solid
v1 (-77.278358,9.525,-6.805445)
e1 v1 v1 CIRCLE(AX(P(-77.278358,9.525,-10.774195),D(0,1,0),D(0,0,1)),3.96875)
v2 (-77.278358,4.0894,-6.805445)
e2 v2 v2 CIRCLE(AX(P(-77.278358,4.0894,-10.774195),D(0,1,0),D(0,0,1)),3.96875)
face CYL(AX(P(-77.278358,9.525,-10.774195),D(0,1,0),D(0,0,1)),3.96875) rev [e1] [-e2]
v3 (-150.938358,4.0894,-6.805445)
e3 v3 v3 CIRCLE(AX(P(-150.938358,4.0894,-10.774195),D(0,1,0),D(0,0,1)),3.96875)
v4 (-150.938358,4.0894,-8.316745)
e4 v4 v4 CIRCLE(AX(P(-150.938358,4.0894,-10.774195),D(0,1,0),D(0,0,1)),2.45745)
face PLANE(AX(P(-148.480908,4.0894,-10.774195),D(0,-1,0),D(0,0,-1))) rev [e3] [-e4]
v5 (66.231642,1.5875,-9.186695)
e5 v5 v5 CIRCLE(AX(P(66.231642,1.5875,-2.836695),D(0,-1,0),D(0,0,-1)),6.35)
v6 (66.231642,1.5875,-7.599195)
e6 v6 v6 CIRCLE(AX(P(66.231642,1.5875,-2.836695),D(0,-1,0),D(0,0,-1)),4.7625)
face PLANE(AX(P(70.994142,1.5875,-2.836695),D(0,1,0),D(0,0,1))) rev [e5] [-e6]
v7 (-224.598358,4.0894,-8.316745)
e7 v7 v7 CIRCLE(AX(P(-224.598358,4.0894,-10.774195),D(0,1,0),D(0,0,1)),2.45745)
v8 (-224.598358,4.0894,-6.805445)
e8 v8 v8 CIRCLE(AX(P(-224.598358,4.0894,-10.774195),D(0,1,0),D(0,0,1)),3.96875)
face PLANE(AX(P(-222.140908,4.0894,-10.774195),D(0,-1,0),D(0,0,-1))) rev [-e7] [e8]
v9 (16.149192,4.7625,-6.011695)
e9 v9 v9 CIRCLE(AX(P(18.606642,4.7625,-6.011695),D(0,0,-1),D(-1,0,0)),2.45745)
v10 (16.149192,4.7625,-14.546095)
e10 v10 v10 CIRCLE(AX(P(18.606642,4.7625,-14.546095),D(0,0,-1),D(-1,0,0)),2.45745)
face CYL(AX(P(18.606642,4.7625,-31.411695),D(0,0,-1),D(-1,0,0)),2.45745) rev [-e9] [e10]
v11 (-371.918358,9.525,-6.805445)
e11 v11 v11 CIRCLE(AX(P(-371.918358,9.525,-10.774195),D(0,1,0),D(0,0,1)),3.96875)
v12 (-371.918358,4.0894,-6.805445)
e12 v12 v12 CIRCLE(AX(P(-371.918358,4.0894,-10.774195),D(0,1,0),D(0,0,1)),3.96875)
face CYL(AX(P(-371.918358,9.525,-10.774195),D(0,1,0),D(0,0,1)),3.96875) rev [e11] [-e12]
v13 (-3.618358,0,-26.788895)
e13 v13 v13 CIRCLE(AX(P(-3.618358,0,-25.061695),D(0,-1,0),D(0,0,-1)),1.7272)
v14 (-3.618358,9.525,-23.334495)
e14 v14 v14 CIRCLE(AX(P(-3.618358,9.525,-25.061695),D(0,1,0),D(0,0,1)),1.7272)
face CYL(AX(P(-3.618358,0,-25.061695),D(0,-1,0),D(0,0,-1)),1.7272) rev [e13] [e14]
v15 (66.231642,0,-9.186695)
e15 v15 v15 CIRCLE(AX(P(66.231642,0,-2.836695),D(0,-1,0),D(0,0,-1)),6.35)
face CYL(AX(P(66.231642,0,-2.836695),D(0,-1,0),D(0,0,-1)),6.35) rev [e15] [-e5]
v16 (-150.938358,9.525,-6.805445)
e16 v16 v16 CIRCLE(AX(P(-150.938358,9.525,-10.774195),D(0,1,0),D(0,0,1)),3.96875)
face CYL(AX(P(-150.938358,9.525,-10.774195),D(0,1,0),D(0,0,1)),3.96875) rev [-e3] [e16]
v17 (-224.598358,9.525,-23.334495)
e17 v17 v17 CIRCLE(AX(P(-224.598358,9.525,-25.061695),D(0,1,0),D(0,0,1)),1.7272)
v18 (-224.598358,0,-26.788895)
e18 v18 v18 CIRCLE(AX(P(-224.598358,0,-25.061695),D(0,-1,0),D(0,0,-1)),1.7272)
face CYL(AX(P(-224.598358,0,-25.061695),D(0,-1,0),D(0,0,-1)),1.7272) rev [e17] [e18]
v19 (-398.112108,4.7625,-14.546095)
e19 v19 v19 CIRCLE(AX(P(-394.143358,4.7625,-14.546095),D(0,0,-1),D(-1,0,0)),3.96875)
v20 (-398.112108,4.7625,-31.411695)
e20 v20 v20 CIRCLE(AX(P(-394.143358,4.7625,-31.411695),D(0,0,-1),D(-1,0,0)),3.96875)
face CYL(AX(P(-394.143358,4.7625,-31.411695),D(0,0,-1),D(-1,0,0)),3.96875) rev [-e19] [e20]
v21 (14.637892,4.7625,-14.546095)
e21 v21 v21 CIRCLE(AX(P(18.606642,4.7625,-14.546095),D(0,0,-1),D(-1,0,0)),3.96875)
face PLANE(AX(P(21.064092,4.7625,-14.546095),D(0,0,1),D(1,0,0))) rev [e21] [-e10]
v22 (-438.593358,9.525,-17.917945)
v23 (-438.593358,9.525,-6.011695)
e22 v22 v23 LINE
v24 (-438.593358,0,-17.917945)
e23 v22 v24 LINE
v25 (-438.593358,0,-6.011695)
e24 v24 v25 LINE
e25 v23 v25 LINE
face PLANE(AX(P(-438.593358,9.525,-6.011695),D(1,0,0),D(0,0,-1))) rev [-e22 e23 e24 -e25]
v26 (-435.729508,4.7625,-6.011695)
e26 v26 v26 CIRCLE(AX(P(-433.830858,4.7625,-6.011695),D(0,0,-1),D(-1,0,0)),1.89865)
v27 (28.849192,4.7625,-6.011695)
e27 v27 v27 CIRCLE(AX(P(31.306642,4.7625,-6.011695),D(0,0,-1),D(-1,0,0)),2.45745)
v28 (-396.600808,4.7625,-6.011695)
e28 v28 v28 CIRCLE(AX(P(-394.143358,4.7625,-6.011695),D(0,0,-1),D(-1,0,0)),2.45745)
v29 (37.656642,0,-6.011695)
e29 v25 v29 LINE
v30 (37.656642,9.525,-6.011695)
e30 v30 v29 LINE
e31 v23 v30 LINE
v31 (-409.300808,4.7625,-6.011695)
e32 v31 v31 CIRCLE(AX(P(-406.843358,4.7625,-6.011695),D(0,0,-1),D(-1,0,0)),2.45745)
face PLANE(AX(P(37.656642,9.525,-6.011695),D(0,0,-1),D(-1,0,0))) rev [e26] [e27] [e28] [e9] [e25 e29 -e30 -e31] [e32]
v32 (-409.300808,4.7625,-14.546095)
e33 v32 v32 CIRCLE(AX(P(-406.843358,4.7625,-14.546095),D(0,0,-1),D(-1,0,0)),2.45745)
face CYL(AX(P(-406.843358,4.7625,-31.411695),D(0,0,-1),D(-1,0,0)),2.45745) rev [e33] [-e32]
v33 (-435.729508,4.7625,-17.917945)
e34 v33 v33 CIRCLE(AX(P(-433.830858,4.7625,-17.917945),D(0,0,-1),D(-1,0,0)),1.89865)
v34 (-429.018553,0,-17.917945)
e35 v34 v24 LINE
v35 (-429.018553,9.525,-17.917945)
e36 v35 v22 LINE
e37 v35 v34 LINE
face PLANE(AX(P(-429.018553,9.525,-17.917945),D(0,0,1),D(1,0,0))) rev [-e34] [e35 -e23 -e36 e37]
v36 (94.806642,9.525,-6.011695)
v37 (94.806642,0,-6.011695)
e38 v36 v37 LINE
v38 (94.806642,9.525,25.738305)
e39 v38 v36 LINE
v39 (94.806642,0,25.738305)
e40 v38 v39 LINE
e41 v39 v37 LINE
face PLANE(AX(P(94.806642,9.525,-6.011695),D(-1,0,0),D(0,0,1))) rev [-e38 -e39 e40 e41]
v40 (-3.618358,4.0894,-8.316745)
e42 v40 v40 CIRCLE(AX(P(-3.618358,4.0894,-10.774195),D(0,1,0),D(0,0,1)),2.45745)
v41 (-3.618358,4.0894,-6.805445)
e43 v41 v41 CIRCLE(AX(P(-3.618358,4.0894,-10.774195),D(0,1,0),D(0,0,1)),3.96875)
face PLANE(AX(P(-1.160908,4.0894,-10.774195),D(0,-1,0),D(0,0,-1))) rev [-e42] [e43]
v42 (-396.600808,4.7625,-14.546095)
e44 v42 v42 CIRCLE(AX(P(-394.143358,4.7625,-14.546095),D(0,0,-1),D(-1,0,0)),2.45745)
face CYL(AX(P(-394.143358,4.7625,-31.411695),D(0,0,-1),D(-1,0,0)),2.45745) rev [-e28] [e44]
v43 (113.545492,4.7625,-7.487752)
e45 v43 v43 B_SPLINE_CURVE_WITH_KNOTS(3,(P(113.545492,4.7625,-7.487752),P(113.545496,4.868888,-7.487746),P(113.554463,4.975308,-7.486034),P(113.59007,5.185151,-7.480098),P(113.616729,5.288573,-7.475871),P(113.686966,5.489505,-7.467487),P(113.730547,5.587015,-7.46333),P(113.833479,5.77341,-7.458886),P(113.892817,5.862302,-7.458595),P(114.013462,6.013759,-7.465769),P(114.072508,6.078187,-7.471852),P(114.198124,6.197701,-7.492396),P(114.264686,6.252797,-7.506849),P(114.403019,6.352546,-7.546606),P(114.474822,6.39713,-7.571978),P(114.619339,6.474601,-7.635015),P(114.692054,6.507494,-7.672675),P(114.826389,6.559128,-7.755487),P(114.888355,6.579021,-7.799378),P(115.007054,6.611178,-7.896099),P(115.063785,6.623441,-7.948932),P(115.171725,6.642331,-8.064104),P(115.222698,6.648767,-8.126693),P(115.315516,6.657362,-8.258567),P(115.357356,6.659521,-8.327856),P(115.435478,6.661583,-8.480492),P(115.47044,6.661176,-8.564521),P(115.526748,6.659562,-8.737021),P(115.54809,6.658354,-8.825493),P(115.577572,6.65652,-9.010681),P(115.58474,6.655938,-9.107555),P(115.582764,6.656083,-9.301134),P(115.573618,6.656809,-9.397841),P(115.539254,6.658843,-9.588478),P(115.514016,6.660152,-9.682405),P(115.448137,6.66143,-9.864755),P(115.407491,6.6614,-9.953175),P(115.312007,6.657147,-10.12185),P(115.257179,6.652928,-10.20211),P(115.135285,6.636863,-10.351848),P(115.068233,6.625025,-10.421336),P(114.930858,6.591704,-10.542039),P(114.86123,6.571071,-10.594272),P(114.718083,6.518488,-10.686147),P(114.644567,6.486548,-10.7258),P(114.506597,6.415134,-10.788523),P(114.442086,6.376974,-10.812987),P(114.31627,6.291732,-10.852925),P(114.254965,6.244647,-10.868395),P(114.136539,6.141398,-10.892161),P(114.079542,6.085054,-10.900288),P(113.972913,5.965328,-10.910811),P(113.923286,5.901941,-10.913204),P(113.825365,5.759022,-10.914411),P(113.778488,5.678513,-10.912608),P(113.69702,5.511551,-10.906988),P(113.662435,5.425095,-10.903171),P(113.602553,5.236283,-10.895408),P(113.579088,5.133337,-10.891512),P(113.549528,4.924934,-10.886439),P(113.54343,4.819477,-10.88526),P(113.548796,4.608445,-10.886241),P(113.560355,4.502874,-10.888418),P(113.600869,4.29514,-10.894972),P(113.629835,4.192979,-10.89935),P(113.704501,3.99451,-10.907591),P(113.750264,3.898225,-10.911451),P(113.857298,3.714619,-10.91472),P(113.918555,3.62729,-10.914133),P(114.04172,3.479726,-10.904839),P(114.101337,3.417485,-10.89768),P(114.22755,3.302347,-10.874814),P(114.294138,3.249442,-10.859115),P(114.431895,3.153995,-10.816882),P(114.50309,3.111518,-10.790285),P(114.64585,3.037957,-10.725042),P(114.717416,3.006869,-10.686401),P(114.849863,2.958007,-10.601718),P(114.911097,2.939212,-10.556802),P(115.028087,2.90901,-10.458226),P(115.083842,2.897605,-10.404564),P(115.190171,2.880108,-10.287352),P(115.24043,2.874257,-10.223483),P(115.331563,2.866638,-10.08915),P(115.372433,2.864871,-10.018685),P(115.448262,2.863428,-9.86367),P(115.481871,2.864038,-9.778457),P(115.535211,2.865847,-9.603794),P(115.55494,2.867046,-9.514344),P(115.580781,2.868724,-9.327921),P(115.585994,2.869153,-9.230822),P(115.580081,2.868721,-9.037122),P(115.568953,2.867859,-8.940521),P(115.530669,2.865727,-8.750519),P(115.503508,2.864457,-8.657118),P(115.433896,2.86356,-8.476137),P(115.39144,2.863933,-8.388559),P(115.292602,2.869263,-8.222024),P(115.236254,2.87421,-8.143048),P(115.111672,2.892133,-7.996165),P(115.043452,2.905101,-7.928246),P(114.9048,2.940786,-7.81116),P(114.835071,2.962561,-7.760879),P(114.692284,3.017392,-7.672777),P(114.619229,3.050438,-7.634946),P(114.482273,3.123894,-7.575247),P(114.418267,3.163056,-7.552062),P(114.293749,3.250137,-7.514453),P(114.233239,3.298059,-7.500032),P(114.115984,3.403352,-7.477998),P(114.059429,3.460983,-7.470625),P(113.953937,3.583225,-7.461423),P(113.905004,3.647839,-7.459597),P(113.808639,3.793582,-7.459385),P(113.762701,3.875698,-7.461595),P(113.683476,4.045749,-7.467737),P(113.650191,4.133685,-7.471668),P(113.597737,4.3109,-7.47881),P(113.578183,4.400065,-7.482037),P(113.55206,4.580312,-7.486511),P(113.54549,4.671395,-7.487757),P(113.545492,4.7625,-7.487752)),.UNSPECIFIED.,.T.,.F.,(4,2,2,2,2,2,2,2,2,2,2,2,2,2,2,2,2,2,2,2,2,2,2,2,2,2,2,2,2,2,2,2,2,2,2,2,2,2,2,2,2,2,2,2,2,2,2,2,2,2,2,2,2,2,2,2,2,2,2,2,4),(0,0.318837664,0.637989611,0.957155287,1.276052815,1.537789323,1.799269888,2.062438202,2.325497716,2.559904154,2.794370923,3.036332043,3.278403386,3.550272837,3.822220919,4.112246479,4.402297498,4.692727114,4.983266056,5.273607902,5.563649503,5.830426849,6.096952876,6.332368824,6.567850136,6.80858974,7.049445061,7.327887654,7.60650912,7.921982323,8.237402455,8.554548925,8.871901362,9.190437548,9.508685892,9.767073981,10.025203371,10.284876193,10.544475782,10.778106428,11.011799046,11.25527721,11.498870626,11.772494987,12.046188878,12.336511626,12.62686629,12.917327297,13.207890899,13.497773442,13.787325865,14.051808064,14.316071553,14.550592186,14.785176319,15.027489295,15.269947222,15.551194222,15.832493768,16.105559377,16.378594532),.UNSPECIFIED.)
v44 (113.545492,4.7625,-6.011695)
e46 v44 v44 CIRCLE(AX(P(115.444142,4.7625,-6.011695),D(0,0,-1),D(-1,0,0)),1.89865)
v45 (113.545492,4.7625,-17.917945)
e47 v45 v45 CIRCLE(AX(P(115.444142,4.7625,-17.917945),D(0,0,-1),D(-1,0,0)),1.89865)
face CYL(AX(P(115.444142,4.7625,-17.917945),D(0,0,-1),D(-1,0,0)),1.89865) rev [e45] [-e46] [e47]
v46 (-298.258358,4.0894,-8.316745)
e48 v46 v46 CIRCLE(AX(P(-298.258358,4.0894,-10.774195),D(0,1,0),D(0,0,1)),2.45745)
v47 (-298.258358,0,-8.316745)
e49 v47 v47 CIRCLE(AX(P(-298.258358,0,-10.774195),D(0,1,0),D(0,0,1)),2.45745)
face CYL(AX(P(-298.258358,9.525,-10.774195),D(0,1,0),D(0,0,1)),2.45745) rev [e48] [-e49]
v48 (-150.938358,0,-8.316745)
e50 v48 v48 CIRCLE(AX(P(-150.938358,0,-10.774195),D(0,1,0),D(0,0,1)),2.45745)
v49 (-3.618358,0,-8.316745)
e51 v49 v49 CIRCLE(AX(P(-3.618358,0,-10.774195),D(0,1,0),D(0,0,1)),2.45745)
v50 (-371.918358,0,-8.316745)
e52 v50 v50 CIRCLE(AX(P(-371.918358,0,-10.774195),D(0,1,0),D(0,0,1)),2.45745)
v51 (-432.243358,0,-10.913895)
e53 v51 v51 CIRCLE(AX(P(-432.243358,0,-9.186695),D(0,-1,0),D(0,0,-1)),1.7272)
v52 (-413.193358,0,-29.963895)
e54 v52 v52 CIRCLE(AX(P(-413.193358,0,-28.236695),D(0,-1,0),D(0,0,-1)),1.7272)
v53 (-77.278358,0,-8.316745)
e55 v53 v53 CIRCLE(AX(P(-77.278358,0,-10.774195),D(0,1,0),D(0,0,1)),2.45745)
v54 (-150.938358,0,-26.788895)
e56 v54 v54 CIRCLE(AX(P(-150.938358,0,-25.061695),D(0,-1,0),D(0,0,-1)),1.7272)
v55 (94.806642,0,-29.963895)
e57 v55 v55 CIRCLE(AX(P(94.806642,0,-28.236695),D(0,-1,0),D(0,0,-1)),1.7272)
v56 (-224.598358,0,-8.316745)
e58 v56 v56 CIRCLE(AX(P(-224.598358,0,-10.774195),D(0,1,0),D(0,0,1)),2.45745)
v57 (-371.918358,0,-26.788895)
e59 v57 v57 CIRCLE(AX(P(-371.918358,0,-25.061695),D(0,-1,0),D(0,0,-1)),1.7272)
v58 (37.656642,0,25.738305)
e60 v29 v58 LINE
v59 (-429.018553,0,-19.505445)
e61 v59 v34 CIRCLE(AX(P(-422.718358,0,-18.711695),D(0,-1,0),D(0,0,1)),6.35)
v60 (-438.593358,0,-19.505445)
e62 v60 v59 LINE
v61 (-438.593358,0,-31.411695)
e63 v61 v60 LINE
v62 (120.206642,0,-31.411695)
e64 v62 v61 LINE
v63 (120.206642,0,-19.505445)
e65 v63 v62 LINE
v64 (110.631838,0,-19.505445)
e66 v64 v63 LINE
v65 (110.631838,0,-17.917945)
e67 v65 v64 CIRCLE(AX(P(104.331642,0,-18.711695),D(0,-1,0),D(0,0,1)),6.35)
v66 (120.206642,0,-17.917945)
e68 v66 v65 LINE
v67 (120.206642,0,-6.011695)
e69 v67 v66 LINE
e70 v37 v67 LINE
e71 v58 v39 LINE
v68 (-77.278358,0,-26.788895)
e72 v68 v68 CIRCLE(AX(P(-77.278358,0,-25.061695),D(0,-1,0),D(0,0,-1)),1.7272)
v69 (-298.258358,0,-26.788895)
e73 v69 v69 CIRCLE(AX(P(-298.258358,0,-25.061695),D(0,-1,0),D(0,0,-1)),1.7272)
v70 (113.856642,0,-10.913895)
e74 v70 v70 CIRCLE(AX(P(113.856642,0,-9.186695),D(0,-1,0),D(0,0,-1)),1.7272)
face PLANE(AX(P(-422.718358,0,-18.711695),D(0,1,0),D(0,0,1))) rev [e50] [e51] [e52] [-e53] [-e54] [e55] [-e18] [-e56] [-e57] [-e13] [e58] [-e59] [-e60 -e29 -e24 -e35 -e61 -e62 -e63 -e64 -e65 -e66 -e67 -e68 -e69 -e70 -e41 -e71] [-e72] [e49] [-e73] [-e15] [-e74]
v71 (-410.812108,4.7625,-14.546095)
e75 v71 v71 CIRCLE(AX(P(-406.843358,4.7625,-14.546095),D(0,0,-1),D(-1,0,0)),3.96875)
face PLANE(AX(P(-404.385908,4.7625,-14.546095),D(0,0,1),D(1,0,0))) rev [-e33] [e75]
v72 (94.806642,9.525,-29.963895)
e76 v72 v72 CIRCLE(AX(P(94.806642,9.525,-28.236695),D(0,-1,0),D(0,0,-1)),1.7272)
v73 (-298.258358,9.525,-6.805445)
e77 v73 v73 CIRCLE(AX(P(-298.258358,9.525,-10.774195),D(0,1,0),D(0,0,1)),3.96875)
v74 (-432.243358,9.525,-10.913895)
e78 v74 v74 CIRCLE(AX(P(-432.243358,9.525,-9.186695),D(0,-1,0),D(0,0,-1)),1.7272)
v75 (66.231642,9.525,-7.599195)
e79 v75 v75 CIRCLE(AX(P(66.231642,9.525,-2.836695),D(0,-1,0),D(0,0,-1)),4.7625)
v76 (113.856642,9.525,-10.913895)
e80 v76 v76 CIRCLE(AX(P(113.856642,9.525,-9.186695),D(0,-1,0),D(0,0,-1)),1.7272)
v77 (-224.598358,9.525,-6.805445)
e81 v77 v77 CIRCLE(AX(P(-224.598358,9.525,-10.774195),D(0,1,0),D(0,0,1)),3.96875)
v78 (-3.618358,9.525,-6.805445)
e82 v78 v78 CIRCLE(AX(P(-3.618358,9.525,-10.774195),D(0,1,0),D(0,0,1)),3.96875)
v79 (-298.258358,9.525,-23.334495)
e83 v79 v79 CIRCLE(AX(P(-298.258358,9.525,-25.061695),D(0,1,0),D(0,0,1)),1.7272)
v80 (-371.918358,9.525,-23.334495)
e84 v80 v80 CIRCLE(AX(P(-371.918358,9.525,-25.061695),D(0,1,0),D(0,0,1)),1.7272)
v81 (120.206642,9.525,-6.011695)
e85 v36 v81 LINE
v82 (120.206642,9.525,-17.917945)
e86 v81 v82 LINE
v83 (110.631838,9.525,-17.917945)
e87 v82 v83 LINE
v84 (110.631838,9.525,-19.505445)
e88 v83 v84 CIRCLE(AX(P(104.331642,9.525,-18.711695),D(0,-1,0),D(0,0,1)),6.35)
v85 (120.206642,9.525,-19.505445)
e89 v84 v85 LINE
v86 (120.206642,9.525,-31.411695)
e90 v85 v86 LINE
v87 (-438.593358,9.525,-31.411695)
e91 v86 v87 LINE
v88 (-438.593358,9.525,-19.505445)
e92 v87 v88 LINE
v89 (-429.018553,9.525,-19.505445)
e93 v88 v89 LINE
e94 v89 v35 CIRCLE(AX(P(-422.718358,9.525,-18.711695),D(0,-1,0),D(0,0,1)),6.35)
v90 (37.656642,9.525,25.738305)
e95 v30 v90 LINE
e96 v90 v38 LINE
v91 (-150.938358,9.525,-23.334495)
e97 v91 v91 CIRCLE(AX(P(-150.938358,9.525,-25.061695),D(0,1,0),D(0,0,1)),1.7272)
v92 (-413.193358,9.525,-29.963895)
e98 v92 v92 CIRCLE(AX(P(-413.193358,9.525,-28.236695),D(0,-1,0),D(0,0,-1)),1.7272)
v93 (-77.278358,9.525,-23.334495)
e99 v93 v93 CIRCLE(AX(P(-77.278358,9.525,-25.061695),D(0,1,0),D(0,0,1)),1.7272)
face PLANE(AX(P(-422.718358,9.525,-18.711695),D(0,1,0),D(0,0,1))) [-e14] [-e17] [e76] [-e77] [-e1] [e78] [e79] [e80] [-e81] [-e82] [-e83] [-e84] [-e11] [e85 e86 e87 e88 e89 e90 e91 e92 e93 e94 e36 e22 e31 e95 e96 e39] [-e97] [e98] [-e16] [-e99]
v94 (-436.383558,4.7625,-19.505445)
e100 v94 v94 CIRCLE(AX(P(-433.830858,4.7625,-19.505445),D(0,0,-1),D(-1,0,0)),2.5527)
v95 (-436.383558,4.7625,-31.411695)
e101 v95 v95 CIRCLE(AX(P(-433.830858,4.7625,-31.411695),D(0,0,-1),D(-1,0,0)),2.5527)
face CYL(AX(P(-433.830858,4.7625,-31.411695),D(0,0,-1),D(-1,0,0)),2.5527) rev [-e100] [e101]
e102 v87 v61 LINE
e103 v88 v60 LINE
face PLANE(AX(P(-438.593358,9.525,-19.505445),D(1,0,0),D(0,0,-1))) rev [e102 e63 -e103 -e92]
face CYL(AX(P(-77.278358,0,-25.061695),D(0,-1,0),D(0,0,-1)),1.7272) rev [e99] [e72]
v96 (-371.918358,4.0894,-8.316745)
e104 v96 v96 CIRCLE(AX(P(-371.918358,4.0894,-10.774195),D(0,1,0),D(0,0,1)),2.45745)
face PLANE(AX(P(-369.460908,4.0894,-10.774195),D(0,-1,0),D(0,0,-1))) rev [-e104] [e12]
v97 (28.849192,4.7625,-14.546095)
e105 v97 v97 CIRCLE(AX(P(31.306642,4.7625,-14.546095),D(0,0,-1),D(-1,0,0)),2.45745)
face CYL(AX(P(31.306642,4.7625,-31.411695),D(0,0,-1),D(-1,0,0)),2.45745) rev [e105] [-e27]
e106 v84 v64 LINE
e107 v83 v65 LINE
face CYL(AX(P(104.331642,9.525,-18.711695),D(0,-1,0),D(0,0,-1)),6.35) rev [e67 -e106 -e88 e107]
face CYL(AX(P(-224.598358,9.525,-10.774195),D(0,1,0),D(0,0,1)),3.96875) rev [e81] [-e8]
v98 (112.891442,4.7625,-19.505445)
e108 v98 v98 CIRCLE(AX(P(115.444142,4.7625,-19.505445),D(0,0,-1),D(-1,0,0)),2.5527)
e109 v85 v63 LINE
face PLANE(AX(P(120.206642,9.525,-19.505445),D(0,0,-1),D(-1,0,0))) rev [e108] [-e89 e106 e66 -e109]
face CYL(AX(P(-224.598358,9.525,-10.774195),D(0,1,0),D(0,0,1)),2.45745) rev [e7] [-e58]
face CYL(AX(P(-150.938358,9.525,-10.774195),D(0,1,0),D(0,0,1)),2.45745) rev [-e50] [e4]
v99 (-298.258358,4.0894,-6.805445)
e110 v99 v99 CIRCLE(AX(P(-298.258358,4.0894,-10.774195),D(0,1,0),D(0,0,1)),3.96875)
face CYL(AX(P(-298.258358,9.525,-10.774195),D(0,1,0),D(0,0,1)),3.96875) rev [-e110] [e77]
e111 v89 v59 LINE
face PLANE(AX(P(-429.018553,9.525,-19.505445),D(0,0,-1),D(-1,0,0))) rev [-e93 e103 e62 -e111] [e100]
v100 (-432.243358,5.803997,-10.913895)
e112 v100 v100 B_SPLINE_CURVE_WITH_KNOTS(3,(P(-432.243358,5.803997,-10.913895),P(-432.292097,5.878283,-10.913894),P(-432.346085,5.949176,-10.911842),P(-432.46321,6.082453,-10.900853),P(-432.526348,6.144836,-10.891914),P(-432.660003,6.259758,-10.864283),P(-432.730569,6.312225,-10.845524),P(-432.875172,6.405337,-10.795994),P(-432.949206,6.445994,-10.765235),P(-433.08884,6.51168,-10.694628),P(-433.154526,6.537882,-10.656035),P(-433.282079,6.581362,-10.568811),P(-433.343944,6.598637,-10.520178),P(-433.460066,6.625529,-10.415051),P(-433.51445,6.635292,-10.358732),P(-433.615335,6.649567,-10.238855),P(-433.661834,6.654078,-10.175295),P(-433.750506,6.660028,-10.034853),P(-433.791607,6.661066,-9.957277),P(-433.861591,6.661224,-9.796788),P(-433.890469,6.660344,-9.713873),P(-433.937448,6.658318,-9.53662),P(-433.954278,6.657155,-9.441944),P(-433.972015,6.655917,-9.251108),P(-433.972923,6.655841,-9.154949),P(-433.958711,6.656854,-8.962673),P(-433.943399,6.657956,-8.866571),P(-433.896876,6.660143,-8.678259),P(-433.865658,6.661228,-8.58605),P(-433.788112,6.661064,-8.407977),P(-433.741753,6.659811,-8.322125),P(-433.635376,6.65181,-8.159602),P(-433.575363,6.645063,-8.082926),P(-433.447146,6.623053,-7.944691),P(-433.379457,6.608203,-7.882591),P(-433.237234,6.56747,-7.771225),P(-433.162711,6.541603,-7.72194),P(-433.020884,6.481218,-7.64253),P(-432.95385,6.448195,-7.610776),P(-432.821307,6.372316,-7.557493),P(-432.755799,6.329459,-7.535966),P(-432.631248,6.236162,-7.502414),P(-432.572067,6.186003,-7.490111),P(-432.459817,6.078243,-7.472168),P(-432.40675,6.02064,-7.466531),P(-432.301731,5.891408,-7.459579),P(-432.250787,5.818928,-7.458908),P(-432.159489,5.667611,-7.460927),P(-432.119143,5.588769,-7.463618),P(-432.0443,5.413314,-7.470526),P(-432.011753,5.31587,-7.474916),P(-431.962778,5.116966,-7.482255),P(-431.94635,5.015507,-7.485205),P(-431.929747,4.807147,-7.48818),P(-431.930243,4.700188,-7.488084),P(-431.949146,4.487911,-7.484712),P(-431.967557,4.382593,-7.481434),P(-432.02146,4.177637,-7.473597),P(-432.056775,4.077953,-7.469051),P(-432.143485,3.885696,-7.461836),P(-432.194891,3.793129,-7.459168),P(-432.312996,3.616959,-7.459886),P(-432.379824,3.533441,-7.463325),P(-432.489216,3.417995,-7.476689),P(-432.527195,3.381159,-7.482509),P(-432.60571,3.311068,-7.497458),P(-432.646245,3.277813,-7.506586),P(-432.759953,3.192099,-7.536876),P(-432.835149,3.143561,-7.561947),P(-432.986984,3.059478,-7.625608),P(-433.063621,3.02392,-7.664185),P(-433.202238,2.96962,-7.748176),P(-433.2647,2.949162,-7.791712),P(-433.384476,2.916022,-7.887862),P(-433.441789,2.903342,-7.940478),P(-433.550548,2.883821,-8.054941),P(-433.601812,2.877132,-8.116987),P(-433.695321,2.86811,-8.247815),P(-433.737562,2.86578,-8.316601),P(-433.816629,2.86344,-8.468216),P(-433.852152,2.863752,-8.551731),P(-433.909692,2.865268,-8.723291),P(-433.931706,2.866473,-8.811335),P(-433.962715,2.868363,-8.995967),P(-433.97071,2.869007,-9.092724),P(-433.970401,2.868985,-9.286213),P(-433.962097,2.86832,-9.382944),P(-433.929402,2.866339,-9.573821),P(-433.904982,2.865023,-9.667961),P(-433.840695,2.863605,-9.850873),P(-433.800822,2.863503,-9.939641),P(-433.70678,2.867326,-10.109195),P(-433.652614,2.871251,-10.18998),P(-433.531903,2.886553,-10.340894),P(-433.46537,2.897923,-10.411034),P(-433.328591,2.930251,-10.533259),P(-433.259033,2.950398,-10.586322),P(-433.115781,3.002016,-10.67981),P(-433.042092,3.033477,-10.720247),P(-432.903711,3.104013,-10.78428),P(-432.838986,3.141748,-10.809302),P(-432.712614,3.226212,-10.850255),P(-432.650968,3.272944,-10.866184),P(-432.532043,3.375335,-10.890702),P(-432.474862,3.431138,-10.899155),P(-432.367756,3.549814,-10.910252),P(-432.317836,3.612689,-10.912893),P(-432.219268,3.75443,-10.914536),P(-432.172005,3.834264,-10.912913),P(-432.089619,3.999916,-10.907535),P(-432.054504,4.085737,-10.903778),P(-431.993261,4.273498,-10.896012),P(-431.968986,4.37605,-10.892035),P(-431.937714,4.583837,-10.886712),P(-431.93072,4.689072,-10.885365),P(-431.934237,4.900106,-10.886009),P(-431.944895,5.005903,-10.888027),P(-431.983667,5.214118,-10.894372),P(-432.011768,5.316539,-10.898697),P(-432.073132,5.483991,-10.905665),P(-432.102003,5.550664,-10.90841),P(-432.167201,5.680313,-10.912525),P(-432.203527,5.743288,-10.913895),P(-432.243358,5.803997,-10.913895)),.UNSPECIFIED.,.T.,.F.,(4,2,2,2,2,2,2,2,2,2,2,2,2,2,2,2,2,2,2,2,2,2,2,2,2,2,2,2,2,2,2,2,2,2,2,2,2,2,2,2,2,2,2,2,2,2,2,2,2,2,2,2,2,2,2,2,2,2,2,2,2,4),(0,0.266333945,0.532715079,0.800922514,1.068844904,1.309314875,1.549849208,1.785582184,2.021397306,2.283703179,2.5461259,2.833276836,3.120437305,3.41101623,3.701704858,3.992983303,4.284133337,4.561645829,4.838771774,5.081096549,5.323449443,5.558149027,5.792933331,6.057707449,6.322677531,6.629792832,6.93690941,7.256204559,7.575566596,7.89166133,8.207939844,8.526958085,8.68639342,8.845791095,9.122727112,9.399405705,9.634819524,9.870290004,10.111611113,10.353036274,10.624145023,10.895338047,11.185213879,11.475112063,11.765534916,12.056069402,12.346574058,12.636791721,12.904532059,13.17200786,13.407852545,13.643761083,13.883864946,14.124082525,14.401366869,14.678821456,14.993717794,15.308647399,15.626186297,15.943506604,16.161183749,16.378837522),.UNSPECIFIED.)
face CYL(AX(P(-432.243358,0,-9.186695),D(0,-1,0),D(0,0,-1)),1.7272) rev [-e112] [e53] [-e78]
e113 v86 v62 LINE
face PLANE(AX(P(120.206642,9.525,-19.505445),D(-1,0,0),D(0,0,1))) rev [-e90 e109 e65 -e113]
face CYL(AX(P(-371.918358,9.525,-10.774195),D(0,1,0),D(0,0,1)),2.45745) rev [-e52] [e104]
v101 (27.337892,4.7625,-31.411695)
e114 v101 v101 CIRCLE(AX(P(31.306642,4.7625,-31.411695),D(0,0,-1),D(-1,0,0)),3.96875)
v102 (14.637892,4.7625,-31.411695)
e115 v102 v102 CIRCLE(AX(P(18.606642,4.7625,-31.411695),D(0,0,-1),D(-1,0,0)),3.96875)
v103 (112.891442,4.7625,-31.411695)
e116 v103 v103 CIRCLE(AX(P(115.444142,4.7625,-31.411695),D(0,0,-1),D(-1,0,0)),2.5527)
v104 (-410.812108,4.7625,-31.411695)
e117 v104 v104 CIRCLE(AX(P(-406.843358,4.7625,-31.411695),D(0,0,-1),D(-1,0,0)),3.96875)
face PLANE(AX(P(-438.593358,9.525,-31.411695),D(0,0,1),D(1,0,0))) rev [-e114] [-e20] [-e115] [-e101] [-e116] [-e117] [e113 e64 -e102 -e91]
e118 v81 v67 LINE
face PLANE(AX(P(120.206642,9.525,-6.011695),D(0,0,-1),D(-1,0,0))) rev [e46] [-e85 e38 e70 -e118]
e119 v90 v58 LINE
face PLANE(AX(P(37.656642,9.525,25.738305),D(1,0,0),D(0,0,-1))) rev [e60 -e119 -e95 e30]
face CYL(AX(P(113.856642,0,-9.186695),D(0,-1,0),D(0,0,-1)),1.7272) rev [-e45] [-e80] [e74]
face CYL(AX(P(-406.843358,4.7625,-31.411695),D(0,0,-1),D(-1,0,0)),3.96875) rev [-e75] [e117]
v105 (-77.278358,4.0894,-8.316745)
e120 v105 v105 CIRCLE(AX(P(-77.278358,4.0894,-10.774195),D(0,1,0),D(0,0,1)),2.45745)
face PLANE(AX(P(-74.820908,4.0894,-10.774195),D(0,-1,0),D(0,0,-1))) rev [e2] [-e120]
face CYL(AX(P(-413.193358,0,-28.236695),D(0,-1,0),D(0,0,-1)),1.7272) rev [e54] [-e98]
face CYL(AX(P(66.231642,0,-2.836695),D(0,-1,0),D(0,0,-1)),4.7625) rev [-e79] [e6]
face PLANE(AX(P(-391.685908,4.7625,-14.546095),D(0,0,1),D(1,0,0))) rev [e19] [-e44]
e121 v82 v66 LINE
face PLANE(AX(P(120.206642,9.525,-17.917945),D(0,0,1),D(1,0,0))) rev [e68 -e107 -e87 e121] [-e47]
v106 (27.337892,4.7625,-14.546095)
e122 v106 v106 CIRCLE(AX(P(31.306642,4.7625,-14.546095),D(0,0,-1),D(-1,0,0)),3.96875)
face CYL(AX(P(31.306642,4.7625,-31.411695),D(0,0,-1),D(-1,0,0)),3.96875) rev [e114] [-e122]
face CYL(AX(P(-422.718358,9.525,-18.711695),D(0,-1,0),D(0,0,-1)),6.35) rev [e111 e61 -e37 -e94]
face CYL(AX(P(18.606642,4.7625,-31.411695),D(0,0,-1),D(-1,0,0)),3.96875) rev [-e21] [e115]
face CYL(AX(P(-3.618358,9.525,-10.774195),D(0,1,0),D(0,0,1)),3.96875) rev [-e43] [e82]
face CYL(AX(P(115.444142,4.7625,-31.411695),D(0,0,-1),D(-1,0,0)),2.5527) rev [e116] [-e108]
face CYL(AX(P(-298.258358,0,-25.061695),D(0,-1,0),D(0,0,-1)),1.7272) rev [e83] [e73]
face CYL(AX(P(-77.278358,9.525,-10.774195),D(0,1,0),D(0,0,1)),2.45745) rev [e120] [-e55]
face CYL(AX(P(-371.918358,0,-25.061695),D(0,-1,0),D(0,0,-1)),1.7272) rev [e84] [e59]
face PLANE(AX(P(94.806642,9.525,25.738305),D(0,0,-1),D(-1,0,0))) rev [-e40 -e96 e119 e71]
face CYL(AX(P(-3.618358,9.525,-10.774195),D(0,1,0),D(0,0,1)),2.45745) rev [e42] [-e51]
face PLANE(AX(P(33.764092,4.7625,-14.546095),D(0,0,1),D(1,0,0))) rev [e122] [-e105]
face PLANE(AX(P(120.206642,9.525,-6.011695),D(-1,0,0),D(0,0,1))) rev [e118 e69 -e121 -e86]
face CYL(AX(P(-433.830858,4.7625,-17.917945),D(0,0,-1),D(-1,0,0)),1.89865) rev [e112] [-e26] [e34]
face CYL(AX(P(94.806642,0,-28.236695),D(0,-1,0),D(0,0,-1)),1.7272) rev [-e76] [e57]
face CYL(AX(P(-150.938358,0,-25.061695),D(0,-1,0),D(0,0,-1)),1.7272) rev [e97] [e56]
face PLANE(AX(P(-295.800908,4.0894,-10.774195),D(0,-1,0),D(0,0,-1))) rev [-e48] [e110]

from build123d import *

# Parameters (mm, degrees)
BOSS_EXTRUDE1_DEPTH                            = 9.525
SKETCH2_W                                      = 1.89865
SKETCH2_H                                      = 43.65625
F_10_CLEARANCE_HOLE1_D                         = 5.1054
F_10_CLEARANCE_HOLE1_DEPTH                     = 11.90625
F_10_CLEARANCE_HOLE2_D                         = 5.1054
F_10_CLEARANCE_HOLE2_DEPTH                     = 11.90625
F_10_24_TAPPED_HOLE2_D                         = 3.7973
CBORE_FOR_8_SOCKET_HEAD_CAP_SCREW1_D           = 4.9149
CBORE_FOR_8_SOCKET_HEAD_CAP_SCREW1_CBORE_D     = 7.9375
CBORE_FOR_8_SOCKET_HEAD_CAP_SCREW1_CBORE_DEPTH = 16.8656
HOLE1_START                                    = 4.0894
HOLE1_OUTLINE_R                                = 1.7272
HOLE1_OUTLINE_R_2                              = 3.96875
HOLE1_OUTLINE_R_3                              = 4.7625
HOLE1_DEPTH                                    = 5.4356
HOLE1_2_OUTLINE_R                              = 1.7272
HOLE1_2_OUTLINE_R_2                            = 2.45745
HOLE1_2_OUTLINE_R_3                            = 4.7625
HOLE1_2_DEPTH                                  = 4.0894
HOLE1_3_OUTLINE_R                              = 6.35
HOLE1_3_OUTLINE_R_2                            = 4.7625
HOLE1_3_DEPTH                                  = 1.5875
F_8_32_TAPPED_HOLE2_D                          = 3.4544


# Read off the part's stored shape, not the designer's step: Hole1
with BuildPart() as part:
    # Sketch1 → Boss-Extrude1 (new body)
    with BuildSketch(Plane(origin=(0, 0, 0), x_dir=(1, 0, 0), z_dir=(0, 1, 0))):
        with BuildLine():
            Line((120.206642486, 6.011694636), (120.206642486, 17.917944636))
            Line((120.206642486, 17.917944636), (110.631837795, 17.917944636))
            ThreePointArc((110.631837795, 17.917944636), (97.981642486, 18.711694636), (110.631837795, 19.505444636))
            Line((110.631837795, 19.505444636), (120.206642486, 19.505444636))
            Line((120.206642486, 19.505444636), (120.206642486, 31.411694636))
            Line((120.206642486, 31.411694636), (-438.593357514, 31.411694636))
            Line((-438.593357514, 31.411694636), (-438.593357514, 19.505444636))
            Line((-438.593357514, 19.505444636), (-429.018552824, 19.505444636))
            ThreePointArc((-429.018552824, 19.505444636), (-416.368357514, 18.711694636), (-429.018552824, 17.917944636))
            Line((-429.018552824, 17.917944636), (-438.593357514, 17.917944636))
            Line((-438.593357514, 17.917944636), (-438.593357514, 6.011694636))
            Line((-438.593357514, 6.011694636), (37.656642486, 6.011694636))
            Line((37.656642486, 6.011694636), (37.656642486, -25.738305364))
            Line((37.656642486, -25.738305364), (94.806642486, -25.738305364))
            Line((94.806642486, -25.738305364), (94.806642486, 6.011694636))
            Line((94.806642486, 6.011694636), (120.206642486, 6.011694636))
        make_face()
    extrude(amount=BOSS_EXTRUDE1_DEPTH)

    # Sketch2 → #10-24 Tapped Hole1 (revolve, cut)
    with BuildSketch(Plane(origin=(115.444142486, 4.7625, -17.917944636), x_dir=(0, 1, 0), z_dir=(1, 0, 0))):
        with Locations((0.949325, 21.828125)):
            Rectangle(SKETCH2_W, SKETCH2_H)
    revolve(axis=Axis((115.444142486, 4.7625, -24.267944636), (0, 0, 1)), mode=Mode.SUBTRACT)

    # #10 Clearance Hole1
    with Locations(Plane(origin=(0, 0, -31.411694636), x_dir=(-1, 0, 0), z_dir=(0, 0, -1))):
        with Locations((-115.444142486, 4.7625)):
            Hole(F_10_CLEARANCE_HOLE1_D / 2, depth=F_10_CLEARANCE_HOLE1_DEPTH)

    # #10 Clearance Hole2
    with Locations(Plane(origin=(0, 0, -31.411694636), x_dir=(-1, 0, 0), z_dir=(0, 0, -1))):
        with Locations((433.830857514, 4.7625)):
            Hole(F_10_CLEARANCE_HOLE2_D / 2, depth=F_10_CLEARANCE_HOLE2_DEPTH)

    # #10-24 Tapped Hole2 (through all)
    with Locations(Plane(origin=(0, 0, -17.917944636), x_dir=(-1, 0, 0), z_dir=(0, 0, -1))):
        with Locations((433.830857514, 4.7625)):
            Hole(F_10_24_TAPPED_HOLE2_D / 2)

    # CBORE for #8 Socket Head Cap Screw1 (through all)
    with Locations(Plane(origin=(0, 0, -31.411694636), x_dir=(-1, 0, 0), z_dir=(0, 0, -1))):
        with Locations((-31.306642486, 4.7625), (-18.606642486, 4.7625), (406.843357514, 4.7625), (394.143357514, 4.7625)):
            CounterBoreHole(CBORE_FOR_8_SOCKET_HEAD_CAP_SCREW1_D / 2, CBORE_FOR_8_SOCKET_HEAD_CAP_SCREW1_CBORE_D / 2, CBORE_FOR_8_SOCKET_HEAD_CAP_SCREW1_CBORE_DEPTH)

    # Hole1 outline → Hole1 (cut)
    with BuildSketch(Plane(origin=(0, 0, 0), x_dir=(1, 0, 0), z_dir=(0, 1, 0)).offset(HOLE1_START)):
        with Locations((-3.618357514, 25.061694636)):
            Circle(HOLE1_OUTLINE_R)
        with Locations((-77.278357514, 25.061694636)):
            Circle(HOLE1_OUTLINE_R)
        with Locations((-150.938357514, 25.061694636)):
            Circle(HOLE1_OUTLINE_R)
        with Locations((-224.598357514, 25.061694636)):
            Circle(HOLE1_OUTLINE_R)
        with Locations((-298.258357514, 25.061694636)):
            Circle(HOLE1_OUTLINE_R)
        with Locations((-371.918357514, 25.061694636)):
            Circle(HOLE1_OUTLINE_R)
        with Locations((-3.618357514, 10.774194636)):
            Circle(HOLE1_OUTLINE_R_2)
        with Locations((-77.278357514, 10.774194636)):
            Circle(HOLE1_OUTLINE_R_2)
        with Locations((-150.938357514, 10.774194636)):
            Circle(HOLE1_OUTLINE_R_2)
        with Locations((-224.598357514, 10.774194636)):
            Circle(HOLE1_OUTLINE_R_2)
        with Locations((-298.258357514, 10.774194636)):
            Circle(HOLE1_OUTLINE_R_2)
        with Locations((-371.918357514, 10.774194636)):
            Circle(HOLE1_OUTLINE_R_2)
        with Locations((66.231642486, 2.836694636)):
            Circle(HOLE1_OUTLINE_R_3)
    extrude(amount=HOLE1_DEPTH, mode=Mode.SUBTRACT)

    # Hole1 2 outline → Hole1 2 (cut)
    with BuildSketch(Plane(origin=(0, 0, 0), x_dir=(1, 0, 0), z_dir=(0, 1, 0))):
        with Locations((-3.618357514, 25.061694636)):
            Circle(HOLE1_2_OUTLINE_R)
        with Locations((-77.278357514, 25.061694636)):
            Circle(HOLE1_2_OUTLINE_R)
        with Locations((-150.938357514, 25.061694636)):
            Circle(HOLE1_2_OUTLINE_R)
        with Locations((-224.598357514, 25.061694636)):
            Circle(HOLE1_2_OUTLINE_R)
        with Locations((-298.258357514, 25.061694636)):
            Circle(HOLE1_2_OUTLINE_R)
        with Locations((-371.918357514, 25.061694636)):
            Circle(HOLE1_2_OUTLINE_R)
        with Locations((-3.618357514, 10.774194636)):
            Circle(HOLE1_2_OUTLINE_R_2)
        with Locations((-77.278357514, 10.774194636)):
            Circle(HOLE1_2_OUTLINE_R_2)
        with Locations((-150.938357514, 10.774194636)):
            Circle(HOLE1_2_OUTLINE_R_2)
        with Locations((-224.598357514, 10.774194636)):
            Circle(HOLE1_2_OUTLINE_R_2)
        with Locations((-298.258357514, 10.774194636)):
            Circle(HOLE1_2_OUTLINE_R_2)
        with Locations((-371.918357514, 10.774194636)):
            Circle(HOLE1_2_OUTLINE_R_2)
        with Locations((66.231642486, 2.836694636)):
            Circle(HOLE1_2_OUTLINE_R_3)
    extrude(amount=HOLE1_2_DEPTH, mode=Mode.SUBTRACT)

    # Hole1 3 outline → Hole1 3 (cut)
    with BuildSketch(Plane(origin=(0, 0, 0), x_dir=(1, 0, 0), z_dir=(0, 1, 0))):
        with Locations((66.231642486, 2.836694636)):
            Circle(HOLE1_3_OUTLINE_R)
        with Locations((66.231642486, 2.836694636)):
            Circle(HOLE1_3_OUTLINE_R_2, mode=Mode.SUBTRACT)
    extrude(amount=HOLE1_3_DEPTH, mode=Mode.SUBTRACT)

    # #8-32 Tapped Hole2 (through all)
    with Locations(Plane(origin=(0, 0, 0), x_dir=(-1, 0, 0), z_dir=(0, -1, 0))):
        with Locations((-94.806642486, 28.236694636), (-113.856642486, 9.186694636), (432.243357514, 9.186694636), (413.193357514, 28.236694636)):
            Hole(F_8_32_TAPPED_HOLE2_D / 2)


solid = part.part
